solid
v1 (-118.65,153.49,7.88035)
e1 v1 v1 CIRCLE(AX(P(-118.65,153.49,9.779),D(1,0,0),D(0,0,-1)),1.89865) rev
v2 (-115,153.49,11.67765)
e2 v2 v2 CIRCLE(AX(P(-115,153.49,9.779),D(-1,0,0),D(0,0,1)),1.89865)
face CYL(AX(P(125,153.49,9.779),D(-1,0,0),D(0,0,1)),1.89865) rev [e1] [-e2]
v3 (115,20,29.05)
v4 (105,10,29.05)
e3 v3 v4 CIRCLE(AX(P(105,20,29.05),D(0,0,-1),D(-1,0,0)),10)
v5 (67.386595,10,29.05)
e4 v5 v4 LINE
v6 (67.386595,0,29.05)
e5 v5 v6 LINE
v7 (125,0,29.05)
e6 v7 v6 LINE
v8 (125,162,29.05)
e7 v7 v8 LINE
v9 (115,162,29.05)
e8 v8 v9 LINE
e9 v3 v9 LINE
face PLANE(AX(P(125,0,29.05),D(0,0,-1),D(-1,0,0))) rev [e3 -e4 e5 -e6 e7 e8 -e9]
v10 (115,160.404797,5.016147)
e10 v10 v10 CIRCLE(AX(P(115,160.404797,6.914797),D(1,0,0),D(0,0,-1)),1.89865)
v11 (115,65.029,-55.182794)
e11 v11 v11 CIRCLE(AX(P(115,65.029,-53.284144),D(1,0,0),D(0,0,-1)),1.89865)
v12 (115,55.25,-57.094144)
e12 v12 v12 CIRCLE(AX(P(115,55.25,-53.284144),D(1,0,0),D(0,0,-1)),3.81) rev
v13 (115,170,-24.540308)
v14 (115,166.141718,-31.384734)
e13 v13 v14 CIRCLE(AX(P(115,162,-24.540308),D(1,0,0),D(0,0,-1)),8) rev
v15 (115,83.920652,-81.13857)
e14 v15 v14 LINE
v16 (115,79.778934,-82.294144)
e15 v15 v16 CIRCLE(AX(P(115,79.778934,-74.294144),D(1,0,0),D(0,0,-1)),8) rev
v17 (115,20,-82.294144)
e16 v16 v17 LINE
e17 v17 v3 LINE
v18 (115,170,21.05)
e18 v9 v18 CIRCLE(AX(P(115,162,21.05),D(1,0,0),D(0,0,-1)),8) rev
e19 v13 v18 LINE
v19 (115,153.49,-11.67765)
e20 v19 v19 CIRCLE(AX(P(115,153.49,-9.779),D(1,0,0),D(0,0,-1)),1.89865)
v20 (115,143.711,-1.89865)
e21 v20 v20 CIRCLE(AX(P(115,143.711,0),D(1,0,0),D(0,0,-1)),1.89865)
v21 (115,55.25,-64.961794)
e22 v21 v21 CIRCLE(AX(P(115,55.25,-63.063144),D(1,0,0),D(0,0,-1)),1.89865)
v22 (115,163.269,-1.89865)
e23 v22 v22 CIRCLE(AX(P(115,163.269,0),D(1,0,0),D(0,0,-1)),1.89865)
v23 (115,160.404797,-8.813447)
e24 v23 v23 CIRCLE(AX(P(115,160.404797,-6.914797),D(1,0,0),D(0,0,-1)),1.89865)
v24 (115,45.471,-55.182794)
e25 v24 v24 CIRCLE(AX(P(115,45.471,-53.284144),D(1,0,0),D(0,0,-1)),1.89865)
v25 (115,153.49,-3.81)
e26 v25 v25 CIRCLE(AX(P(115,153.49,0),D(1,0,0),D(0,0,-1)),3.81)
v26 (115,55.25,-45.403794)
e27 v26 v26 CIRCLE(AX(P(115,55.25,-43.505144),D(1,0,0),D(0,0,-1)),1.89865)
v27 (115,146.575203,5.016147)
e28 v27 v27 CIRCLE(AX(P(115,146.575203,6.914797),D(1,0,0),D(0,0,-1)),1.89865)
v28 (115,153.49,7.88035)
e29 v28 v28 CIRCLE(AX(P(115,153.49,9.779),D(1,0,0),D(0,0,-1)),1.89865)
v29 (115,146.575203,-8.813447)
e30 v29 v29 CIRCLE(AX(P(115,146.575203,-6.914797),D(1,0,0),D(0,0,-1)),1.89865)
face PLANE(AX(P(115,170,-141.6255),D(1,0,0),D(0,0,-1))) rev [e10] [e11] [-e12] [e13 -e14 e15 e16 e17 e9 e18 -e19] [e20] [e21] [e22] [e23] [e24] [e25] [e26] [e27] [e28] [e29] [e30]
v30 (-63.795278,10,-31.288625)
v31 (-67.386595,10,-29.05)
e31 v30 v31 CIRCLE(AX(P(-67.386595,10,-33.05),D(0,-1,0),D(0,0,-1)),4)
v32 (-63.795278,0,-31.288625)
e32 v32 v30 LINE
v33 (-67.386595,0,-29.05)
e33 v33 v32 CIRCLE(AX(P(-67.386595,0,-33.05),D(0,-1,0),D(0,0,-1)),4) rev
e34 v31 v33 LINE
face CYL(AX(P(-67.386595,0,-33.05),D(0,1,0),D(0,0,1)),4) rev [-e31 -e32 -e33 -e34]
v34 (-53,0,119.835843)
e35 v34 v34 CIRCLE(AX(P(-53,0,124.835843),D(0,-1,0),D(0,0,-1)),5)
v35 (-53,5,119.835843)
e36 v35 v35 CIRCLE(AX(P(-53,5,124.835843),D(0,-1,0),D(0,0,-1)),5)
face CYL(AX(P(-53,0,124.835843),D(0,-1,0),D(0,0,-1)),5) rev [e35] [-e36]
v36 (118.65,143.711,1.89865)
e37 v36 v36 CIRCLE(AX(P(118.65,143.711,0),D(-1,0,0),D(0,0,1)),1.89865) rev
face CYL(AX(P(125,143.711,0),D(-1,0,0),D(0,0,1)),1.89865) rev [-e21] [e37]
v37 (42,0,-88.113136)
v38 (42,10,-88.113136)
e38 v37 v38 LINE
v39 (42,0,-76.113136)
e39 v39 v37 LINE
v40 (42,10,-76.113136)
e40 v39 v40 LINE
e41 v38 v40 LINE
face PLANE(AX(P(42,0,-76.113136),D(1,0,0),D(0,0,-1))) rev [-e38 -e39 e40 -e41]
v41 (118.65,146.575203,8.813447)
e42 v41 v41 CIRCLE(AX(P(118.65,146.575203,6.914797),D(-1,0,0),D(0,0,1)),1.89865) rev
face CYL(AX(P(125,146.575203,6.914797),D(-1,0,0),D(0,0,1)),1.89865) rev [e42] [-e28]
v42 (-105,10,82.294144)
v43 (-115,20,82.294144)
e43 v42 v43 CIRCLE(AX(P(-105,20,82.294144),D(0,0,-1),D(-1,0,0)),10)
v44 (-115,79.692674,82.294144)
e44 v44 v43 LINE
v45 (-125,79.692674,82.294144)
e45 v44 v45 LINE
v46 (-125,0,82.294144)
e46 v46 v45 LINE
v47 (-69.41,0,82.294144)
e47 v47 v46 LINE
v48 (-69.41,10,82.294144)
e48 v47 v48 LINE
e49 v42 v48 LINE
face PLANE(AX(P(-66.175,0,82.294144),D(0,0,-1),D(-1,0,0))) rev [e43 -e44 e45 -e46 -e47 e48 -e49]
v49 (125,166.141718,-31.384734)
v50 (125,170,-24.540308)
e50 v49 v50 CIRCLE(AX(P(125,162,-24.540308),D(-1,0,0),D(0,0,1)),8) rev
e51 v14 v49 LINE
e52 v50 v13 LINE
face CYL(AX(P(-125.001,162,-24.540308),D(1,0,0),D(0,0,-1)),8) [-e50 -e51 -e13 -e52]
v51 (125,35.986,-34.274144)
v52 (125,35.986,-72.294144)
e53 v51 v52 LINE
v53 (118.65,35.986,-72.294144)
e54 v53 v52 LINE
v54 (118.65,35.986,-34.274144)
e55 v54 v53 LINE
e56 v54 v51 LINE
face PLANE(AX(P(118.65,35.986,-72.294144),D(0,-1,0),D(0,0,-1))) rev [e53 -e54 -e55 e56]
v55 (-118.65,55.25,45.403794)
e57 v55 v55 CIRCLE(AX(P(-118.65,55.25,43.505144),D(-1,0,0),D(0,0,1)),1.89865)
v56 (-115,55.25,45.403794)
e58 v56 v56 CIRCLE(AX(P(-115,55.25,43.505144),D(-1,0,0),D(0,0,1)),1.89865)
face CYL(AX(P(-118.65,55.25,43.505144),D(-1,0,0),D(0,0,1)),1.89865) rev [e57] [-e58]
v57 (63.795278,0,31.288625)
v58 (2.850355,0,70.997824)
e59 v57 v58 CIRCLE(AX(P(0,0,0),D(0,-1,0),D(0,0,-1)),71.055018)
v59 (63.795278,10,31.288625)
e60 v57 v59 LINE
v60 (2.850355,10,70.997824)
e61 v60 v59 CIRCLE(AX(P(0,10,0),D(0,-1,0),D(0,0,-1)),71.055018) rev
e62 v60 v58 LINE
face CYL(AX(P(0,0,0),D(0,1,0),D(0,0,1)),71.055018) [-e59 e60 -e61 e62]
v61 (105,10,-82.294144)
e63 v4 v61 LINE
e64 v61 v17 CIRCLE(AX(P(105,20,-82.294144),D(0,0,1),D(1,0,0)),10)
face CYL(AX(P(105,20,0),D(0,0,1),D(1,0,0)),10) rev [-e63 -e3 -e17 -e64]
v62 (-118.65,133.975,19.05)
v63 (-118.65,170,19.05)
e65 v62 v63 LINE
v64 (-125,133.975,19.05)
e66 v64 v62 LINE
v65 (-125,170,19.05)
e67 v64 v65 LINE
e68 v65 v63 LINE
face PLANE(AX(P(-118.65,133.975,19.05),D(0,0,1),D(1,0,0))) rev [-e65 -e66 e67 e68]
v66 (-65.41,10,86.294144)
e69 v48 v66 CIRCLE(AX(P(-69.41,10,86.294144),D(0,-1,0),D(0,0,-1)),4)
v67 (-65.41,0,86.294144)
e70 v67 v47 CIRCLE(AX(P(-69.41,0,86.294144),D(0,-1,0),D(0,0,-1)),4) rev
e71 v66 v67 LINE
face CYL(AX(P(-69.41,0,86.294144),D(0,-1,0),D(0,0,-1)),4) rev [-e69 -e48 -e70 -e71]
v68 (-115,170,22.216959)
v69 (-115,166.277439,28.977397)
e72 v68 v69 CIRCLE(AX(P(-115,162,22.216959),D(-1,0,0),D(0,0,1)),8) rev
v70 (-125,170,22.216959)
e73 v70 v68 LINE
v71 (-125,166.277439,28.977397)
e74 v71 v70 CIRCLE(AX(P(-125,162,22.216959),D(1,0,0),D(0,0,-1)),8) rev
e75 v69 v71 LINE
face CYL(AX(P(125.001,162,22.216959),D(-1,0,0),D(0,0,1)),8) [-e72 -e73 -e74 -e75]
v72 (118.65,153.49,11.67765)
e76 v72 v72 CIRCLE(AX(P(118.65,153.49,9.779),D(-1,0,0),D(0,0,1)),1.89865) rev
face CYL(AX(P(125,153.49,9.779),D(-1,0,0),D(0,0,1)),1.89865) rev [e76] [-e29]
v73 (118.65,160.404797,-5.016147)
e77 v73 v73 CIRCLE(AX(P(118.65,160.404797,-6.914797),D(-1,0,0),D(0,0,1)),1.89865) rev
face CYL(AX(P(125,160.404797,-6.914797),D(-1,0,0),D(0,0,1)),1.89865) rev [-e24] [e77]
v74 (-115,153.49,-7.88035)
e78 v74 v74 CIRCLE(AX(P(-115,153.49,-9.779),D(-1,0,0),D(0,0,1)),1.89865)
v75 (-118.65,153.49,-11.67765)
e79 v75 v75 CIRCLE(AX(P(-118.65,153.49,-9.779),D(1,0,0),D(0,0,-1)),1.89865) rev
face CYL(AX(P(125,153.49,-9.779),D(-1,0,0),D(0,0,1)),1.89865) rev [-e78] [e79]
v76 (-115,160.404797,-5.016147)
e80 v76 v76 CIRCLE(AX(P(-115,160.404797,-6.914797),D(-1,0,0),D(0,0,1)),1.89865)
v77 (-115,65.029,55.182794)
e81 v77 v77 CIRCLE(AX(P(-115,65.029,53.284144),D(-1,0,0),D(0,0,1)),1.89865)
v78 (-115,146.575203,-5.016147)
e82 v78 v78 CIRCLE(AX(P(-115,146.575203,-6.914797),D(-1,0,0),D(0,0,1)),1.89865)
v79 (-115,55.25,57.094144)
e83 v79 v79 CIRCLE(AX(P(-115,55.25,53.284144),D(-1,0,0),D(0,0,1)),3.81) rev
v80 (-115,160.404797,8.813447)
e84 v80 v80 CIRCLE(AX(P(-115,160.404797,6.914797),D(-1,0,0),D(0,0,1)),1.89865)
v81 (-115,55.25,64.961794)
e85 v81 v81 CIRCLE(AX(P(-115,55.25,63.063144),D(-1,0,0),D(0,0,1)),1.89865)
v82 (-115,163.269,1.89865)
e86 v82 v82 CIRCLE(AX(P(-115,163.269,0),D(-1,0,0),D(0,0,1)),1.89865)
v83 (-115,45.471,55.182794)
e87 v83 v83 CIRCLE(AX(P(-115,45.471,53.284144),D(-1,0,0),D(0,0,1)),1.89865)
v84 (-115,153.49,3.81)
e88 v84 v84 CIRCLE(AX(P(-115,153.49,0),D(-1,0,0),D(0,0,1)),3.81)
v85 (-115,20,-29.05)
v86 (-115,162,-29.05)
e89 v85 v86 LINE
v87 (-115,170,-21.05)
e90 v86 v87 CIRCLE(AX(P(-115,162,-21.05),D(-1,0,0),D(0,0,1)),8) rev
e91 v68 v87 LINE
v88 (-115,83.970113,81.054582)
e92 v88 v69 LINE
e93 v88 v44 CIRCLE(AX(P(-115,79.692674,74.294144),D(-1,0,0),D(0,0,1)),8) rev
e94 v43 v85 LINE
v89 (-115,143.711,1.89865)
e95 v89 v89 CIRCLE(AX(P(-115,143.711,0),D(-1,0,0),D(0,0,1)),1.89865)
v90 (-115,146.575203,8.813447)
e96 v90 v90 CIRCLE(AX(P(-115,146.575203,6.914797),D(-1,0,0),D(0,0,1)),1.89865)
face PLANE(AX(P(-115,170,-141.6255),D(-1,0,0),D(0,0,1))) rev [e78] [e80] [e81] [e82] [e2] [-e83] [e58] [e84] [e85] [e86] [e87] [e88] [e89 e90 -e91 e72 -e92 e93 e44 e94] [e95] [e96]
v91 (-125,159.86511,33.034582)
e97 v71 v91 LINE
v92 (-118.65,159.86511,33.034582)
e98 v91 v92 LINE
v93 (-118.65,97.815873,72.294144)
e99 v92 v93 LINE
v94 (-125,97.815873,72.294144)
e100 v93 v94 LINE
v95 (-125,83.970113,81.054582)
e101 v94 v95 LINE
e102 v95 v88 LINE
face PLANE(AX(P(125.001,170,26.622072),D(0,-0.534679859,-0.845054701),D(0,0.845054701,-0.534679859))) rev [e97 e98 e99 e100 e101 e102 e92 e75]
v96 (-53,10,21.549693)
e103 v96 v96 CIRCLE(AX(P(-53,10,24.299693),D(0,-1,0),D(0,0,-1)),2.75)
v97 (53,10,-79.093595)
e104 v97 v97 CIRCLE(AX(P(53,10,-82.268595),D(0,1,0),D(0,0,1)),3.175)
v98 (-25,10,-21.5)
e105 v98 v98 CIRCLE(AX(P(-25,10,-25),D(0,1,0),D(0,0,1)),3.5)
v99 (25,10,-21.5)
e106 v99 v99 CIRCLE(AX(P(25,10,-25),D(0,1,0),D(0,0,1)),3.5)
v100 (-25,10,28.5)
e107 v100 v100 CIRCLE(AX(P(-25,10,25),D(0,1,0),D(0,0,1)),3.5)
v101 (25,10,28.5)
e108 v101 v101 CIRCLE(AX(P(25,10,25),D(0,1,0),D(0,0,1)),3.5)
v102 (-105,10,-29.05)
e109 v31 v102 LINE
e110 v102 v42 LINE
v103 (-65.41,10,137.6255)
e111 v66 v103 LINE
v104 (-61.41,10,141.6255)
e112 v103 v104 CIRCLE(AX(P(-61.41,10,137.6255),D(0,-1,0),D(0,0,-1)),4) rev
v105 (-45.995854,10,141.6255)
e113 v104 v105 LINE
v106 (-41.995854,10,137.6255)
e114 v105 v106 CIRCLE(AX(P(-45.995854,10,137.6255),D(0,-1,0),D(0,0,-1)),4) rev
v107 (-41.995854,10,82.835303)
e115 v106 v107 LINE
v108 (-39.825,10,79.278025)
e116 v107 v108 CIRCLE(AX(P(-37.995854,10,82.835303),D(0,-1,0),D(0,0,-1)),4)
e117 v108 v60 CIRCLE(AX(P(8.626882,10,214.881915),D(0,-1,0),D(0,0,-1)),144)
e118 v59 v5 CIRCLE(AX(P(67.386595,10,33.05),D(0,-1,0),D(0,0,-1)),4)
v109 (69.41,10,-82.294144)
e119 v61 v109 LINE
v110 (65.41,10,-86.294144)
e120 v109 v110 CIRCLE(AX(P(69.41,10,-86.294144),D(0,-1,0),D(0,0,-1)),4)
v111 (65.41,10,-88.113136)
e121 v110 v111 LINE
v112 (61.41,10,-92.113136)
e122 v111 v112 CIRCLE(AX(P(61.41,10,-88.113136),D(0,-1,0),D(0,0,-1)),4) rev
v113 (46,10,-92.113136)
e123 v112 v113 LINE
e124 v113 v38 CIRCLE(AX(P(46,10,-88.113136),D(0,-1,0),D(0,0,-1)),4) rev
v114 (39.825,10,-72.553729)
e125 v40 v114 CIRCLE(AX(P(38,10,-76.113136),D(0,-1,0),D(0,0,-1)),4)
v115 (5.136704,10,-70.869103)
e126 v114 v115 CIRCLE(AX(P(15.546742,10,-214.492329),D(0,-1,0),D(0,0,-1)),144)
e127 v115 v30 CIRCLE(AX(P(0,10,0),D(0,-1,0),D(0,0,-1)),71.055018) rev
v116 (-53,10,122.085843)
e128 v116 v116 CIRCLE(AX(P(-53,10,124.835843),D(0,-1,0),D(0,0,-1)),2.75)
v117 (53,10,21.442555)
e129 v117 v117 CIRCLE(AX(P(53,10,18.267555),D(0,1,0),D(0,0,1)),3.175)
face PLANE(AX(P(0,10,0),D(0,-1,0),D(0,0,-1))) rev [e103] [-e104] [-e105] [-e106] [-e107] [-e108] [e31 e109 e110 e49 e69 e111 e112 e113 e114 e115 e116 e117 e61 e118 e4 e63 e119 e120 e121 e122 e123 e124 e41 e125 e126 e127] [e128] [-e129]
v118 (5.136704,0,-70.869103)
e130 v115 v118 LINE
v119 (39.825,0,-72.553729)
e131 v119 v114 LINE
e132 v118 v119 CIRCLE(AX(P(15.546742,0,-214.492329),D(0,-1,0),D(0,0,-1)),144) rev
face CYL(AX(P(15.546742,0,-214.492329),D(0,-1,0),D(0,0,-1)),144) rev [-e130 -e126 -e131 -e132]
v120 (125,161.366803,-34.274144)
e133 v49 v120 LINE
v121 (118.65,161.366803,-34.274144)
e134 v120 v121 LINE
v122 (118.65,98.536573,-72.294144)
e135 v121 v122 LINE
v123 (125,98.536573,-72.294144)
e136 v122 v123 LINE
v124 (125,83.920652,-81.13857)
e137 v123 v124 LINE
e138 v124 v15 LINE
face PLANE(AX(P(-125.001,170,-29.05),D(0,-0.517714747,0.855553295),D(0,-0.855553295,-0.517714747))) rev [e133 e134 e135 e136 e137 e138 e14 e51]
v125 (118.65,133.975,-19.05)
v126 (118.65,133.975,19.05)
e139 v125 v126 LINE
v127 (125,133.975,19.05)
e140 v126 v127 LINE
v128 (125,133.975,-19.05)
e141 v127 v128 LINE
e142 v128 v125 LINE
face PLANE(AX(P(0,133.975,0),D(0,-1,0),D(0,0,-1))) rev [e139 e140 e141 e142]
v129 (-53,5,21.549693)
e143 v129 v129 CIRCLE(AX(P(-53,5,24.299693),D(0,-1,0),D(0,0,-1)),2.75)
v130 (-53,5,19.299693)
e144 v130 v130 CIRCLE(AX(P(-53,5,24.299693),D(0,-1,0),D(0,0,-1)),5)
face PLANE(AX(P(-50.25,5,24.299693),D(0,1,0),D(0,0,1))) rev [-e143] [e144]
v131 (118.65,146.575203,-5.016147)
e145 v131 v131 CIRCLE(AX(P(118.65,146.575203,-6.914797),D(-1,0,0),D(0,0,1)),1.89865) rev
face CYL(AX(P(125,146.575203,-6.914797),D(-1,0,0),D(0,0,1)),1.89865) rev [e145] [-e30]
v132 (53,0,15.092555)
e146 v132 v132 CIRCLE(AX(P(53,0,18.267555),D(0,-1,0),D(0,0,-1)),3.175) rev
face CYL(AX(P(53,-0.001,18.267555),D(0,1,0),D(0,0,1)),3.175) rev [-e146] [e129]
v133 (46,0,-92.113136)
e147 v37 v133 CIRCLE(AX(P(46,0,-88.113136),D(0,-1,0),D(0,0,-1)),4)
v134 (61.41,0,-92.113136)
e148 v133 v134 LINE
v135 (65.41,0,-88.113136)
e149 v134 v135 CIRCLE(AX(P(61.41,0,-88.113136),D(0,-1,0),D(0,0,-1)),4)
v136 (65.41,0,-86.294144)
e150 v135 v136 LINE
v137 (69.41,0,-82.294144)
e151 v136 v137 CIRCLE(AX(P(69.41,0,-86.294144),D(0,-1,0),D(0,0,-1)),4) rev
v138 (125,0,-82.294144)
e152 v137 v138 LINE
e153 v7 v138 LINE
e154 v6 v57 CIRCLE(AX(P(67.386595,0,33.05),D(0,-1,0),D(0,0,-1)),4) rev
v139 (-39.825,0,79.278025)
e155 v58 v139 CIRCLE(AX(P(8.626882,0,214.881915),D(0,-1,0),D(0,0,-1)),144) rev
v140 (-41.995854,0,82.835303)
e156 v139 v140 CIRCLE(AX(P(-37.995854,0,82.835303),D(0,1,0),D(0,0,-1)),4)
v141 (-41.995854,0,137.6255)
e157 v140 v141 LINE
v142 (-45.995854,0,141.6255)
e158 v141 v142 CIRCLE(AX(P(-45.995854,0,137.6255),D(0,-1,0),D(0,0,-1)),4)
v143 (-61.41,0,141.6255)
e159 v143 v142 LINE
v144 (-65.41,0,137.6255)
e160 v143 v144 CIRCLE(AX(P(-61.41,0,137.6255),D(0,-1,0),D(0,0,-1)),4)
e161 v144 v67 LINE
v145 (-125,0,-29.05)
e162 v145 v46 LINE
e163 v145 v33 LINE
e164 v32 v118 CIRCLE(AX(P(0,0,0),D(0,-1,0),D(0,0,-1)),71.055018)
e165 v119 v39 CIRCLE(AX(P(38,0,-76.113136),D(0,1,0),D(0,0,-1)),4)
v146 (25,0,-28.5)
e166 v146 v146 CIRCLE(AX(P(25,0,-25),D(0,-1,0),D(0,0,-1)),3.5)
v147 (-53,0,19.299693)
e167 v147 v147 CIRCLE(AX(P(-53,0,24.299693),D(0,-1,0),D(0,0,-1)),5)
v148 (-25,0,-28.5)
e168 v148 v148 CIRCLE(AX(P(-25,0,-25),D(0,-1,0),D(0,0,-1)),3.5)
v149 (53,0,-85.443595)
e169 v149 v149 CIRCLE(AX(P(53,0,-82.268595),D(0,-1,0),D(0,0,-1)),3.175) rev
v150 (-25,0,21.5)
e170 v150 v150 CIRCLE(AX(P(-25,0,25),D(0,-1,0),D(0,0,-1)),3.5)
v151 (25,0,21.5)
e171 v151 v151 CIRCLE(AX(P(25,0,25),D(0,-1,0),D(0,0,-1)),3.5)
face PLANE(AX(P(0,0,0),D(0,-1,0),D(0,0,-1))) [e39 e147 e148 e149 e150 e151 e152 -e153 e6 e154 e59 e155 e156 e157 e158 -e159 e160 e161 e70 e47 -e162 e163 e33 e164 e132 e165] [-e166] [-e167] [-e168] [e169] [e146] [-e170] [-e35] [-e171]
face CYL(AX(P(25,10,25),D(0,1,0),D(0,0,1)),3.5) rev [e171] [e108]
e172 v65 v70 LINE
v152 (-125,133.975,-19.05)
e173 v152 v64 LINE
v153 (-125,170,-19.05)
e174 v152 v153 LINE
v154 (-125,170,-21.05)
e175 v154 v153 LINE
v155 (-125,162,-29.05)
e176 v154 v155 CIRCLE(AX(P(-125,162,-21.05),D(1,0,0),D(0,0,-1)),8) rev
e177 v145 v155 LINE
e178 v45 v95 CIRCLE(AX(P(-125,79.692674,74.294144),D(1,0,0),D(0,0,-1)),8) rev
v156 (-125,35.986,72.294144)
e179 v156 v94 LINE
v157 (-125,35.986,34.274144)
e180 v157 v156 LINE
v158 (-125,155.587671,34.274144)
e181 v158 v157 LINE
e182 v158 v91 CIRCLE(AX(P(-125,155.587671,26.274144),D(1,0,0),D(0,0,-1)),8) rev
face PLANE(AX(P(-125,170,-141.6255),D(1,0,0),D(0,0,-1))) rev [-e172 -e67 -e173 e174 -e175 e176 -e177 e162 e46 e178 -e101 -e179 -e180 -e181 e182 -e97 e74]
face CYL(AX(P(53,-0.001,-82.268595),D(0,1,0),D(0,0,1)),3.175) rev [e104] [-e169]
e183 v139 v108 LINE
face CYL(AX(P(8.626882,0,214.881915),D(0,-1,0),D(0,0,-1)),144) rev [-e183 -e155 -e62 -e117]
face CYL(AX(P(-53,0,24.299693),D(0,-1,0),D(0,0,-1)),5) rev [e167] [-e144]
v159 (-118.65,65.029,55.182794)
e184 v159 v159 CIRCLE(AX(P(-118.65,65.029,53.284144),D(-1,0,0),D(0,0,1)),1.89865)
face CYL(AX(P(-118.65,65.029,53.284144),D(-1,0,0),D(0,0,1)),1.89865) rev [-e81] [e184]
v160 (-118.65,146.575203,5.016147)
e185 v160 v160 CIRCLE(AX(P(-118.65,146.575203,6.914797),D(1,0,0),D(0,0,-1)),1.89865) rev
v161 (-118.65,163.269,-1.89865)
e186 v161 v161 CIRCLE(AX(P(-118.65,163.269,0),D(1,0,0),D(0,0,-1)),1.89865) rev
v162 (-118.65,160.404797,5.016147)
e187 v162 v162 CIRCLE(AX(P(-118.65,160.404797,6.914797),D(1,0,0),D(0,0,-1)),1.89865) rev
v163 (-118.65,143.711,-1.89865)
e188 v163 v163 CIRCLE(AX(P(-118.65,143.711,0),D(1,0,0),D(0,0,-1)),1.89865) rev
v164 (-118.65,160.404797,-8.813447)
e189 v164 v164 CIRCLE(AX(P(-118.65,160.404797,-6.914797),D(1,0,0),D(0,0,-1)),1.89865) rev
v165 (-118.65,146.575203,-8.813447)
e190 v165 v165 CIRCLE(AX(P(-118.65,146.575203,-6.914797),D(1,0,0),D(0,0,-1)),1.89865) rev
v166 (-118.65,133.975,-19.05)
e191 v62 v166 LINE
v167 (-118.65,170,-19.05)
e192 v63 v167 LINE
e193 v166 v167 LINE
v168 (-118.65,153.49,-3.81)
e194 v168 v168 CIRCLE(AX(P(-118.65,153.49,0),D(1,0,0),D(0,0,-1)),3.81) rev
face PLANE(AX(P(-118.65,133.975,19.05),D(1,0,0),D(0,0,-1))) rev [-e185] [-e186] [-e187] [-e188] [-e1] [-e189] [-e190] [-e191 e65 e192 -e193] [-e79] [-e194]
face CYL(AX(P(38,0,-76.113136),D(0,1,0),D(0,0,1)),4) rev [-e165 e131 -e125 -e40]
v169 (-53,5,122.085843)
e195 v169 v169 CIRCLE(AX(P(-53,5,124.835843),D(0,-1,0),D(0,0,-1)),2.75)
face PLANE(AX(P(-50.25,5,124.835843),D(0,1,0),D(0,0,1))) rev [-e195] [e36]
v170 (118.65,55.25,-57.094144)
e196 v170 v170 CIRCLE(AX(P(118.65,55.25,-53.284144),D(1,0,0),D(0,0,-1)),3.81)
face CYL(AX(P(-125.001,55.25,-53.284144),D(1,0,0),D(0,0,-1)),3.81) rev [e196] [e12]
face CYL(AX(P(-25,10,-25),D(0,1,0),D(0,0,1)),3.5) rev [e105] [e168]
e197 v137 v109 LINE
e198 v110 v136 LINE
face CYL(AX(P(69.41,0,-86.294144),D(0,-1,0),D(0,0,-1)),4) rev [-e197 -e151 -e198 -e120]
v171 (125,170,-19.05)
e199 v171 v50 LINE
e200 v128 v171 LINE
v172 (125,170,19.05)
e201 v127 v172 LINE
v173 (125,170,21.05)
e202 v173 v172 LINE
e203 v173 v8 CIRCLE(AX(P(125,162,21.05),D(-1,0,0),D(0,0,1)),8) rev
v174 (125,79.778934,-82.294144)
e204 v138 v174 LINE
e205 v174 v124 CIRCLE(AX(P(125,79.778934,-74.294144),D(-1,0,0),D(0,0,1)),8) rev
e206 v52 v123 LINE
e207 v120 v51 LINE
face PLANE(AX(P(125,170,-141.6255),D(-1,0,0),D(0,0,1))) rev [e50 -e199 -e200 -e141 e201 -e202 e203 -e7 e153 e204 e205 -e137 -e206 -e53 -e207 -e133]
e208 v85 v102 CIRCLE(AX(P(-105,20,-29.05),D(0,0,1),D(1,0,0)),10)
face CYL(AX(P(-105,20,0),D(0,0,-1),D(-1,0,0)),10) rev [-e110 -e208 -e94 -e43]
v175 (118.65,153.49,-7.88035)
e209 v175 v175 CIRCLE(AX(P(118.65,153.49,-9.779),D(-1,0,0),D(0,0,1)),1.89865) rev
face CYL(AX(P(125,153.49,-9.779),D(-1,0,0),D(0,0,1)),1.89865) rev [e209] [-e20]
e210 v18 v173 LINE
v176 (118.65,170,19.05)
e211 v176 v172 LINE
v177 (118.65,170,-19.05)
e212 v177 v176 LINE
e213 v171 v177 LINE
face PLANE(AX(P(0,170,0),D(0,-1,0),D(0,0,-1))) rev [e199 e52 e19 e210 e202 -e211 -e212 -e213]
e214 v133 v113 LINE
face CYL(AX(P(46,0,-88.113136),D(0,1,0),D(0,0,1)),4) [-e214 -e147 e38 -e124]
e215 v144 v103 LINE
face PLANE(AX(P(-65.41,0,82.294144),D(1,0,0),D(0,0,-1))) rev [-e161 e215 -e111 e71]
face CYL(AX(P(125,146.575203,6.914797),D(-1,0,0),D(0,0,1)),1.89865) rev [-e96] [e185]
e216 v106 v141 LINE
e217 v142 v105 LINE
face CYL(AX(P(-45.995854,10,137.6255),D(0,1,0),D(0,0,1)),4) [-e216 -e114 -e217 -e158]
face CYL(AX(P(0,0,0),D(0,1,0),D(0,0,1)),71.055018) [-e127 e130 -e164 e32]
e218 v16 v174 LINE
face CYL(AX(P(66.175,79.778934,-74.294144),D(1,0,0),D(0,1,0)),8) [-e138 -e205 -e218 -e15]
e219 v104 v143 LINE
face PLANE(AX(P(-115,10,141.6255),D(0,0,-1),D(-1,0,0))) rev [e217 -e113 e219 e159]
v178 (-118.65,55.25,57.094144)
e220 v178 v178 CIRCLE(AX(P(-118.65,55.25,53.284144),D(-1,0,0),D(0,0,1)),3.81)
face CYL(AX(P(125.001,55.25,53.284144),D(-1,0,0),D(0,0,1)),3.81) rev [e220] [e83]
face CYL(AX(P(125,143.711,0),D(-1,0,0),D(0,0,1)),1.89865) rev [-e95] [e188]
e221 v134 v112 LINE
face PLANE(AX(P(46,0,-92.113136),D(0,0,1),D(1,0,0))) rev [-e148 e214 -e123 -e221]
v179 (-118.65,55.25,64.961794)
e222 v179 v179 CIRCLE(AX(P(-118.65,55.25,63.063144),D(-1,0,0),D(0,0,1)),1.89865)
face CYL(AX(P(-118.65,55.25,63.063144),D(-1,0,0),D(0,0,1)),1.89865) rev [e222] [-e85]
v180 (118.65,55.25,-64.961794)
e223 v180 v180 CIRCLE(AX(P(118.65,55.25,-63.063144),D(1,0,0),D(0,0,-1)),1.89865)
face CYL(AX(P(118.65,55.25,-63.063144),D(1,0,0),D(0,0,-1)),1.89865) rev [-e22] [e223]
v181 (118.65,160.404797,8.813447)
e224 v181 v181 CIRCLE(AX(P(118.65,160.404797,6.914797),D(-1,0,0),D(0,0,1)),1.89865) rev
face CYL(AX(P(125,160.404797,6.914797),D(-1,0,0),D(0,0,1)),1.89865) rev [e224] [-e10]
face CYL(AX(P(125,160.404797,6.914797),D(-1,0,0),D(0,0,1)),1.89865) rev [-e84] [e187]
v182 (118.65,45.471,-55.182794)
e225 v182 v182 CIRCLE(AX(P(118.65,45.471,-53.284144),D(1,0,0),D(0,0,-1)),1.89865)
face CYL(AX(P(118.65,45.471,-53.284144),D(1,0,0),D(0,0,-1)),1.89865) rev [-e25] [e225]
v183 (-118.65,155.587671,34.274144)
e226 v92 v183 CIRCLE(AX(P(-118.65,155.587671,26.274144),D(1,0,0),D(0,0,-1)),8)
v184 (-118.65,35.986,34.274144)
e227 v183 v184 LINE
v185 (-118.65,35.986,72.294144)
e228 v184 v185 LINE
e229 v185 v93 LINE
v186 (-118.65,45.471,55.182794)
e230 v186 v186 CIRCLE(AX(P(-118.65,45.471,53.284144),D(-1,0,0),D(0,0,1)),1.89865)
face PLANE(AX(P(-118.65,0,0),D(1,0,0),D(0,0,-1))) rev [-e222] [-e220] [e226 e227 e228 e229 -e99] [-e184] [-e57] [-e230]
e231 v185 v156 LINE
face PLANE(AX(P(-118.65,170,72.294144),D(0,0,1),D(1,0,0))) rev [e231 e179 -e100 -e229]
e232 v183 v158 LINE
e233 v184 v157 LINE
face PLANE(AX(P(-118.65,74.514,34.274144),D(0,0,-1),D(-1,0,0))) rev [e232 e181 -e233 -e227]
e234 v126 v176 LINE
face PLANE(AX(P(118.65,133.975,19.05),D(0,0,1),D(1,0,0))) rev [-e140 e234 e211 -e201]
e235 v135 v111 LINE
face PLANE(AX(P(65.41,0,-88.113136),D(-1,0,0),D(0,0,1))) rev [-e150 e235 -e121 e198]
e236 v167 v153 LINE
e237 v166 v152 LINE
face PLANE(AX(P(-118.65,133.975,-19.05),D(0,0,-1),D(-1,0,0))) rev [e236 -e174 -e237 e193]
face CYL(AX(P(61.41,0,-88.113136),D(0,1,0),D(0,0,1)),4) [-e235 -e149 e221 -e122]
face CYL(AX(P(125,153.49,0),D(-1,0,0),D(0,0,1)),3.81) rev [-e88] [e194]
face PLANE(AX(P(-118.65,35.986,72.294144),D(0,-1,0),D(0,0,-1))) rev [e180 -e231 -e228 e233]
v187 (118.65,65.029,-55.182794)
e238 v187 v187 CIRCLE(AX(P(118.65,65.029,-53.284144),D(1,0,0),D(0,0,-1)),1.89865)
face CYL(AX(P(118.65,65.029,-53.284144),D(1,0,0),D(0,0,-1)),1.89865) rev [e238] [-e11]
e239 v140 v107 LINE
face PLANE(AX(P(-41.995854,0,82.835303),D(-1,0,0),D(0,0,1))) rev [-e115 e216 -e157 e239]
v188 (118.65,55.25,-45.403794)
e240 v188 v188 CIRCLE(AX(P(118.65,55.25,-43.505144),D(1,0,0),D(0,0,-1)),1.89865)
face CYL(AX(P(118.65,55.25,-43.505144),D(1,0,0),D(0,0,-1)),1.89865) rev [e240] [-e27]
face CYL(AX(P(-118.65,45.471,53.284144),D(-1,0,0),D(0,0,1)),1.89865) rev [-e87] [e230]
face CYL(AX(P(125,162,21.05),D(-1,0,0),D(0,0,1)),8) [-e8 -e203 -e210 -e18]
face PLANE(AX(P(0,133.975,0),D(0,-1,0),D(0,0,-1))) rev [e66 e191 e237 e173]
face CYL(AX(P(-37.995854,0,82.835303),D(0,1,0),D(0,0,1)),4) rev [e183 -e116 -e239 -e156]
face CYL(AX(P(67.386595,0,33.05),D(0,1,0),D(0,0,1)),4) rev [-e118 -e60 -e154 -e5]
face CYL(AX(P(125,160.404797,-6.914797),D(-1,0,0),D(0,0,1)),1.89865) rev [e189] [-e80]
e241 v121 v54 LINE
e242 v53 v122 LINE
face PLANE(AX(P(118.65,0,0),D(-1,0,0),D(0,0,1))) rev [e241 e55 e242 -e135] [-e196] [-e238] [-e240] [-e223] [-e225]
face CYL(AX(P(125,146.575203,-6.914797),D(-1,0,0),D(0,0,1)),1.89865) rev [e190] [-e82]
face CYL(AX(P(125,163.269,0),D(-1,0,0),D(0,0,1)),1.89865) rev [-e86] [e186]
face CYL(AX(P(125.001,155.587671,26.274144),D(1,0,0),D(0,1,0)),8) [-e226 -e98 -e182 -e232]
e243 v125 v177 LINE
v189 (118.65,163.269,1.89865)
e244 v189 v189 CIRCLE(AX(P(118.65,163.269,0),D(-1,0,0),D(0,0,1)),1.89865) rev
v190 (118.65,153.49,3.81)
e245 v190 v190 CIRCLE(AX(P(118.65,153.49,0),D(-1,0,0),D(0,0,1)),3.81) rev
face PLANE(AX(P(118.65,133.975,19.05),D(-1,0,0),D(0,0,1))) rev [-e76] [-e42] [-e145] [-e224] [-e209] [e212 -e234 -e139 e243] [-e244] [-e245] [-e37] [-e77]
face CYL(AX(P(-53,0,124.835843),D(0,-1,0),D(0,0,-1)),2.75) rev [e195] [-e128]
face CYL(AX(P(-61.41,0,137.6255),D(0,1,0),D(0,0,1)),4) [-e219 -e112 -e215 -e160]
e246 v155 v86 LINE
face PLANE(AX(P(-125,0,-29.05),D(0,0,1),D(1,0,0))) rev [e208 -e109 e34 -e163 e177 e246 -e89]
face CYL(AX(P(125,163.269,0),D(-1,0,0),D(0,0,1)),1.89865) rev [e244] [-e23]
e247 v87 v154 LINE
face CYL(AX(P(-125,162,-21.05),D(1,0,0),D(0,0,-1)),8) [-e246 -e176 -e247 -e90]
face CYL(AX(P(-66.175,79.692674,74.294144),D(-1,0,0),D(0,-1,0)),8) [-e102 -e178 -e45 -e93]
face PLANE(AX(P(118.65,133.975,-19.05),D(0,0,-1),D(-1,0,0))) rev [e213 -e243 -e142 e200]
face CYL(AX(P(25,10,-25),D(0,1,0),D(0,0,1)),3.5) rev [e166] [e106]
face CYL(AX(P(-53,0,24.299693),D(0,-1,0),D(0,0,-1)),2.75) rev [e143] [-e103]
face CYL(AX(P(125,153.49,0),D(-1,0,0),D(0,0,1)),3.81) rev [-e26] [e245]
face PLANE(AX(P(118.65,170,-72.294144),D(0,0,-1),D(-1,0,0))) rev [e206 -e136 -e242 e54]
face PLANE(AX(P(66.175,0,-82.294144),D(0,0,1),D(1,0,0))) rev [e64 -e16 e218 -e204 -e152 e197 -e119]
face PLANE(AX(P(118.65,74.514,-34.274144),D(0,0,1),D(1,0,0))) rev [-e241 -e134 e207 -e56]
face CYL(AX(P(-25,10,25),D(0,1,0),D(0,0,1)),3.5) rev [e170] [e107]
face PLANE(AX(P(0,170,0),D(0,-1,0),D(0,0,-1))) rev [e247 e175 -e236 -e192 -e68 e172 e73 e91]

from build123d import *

# Parameters (mm, degrees)
SKETCH2_W                      = 230
SKETCH2_H                      = 283.251
BOSS_EXTRUDE1_DEPTH            = 10
SKETCH3_W                      = 10
SKETCH3_H                      = 283.251
BOSS_EXTRUDE2_DEPTH            = 170
M6_CLEARANCE_HOLE1_D           = 7
CUT_EXTRUDE1_DEPTH             = 327.431895271
CUT_EXTRUDE1_DEPTH_BACK        = 327.431895271
SKETCH7_R                      = 3.81
SKETCH7_R_2                    = 1.89865
SKETCH8_W                      = 6.35
SKETCH8_H                      = 38.1
CUT_EXTRUDE2_DEPTH             = 36.025
CUT_EXTRUDE3_DEPTH             = 6.35
CUT_EXTRUDE4_REACH             = 331.125
SKETCH11_R                     = 3.81
F_6_CLEARANCE_HOLE1_D          = 3.7973
F_6_CLEARANCE_HOLE1_DEPTH      = 3.65
CIRPATTERN1_COUNT              = 2
ENL_V_MAT_EXTRU_1_REACH        = 249.554
ESQUISSE1_R                    = 3.175
CBORE_FOR_M5_SHCS1_D           = 5.5
CBORE_FOR_M5_SHCS1_CBORE_D     = 10
CBORE_FOR_M5_SHCS1_CBORE_DEPTH = 5
CUT_EXTRUDE5_DEPTH             = 248.553594703
CUT_EXTRUDE5_DEPTH_BACK        = 248.553594703
SKETCH15_W                     = 58.825
SKETCH15_H                     = 59.331356017
CUT_EXTRUDE7_DEPTH             = 248.553594703
CUT_EXTRUDE7_DEPTH_BACK        = 248.553594703
SKETCH20_W                     = 0.765
SKETCH20_H                     = 59.331356017
FILLET2_R                      = 4
FILLET3_R                      = 144
FILLET4_R                      = 4
CUT_EXTRUDE8_REACH             = 335.853
CUT_EXTRUDE9_REACH             = 335.853
FILLET5_R                      = 8
FILLET6_R                      = 8
FILLET7_R                      = 10


with BuildPart() as part:
    # Sketch2 → Boss-Extrude1 (new body)
    with BuildSketch(Plane(origin=(0, 0, 0), x_dir=(1, 0, 0), z_dir=(0, 1, 0))):
        Rectangle(SKETCH2_W, SKETCH2_H)
    extrude(amount=BOSS_EXTRUDE1_DEPTH)

    # Sketch3 → Boss-Extrude2 (add)
    with BuildSketch(Plane(origin=(0, 0, 0), x_dir=(1, 0, 0), z_dir=(0, 1, 0))):
        with Locations((-120, 0)):
            Rectangle(SKETCH3_W, SKETCH3_H)
        with Locations((120, 0)):
            Rectangle(SKETCH3_W, SKETCH3_H)
    extrude(amount=BOSS_EXTRUDE2_DEPTH)

    # M6 Clearance Hole1 (through all)
    with Locations(Plane(origin=(0, 10, 0), x_dir=(1, 0, 0), z_dir=(0, 1, 0))):
        with Locations((-25, 25), (25, 25), (25, -25), (-25, -25)):
            Hole(M6_CLEARANCE_HOLE1_D / 2)

    # Sketch7 → Cut-Extrude1 (cut, two sides: drawn at the far end of the back side and taken through both)
    with BuildSketch(Plane.ZY.offset(-115).offset(-CUT_EXTRUDE1_DEPTH_BACK)):
        with Locations((0, 153.49)):
            Circle(SKETCH7_R)
        with Locations((0, 163.269)):
            Circle(SKETCH7_R_2)
        with Locations((6.914797213, 160.404797213)):
            Circle(SKETCH7_R_2)
        with Locations((9.779, 153.49)):
            Circle(SKETCH7_R_2)
        with Locations((6.914797213, 146.575202787)):
            Circle(SKETCH7_R_2)
        with Locations((0, 143.711)):
            Circle(SKETCH7_R_2)
        with Locations((-6.914797213, 146.575202787)):
            Circle(SKETCH7_R_2)
        with Locations((-9.779, 153.49)):
            Circle(SKETCH7_R_2)
        with Locations((-6.914797213, 160.404797213)):
            Circle(SKETCH7_R_2)
    extrude(amount=CUT_EXTRUDE1_DEPTH + CUT_EXTRUDE1_DEPTH_BACK, mode=Mode.SUBTRACT)

    # Sketch8 → Cut-Extrude2 (cut)
    with BuildSketch(Plane(origin=(0, 170, 0), x_dir=(1, 0, 0), z_dir=(0, 1, 0))):
        with Locations((121.825, 0)):
            Rectangle(SKETCH8_W, SKETCH8_H)
        with Locations((-121.825, 0)):
            Rectangle(SKETCH8_W, SKETCH8_H)
    extrude(amount=-CUT_EXTRUDE2_DEPTH, mode=Mode.SUBTRACT)

    # Sketch9 → Cut-Extrude3 (cut)
    with BuildSketch(Plane(origin=(125, 0, 0), x_dir=(0, 0, -1), z_dir=(1, 0, 0))):
        Polygon((72.294143983, 74.514), (72.294143983, 35.986), (34.274143983, 35.986), (34.274143983, 74.514), (34.274143983, 170), (72.294143983, 170), align=None)
    cut_extrude3 = extrude(amount=-CUT_EXTRUDE3_DEPTH, mode=Mode.SUBTRACT)

    # Sketch11 → Cut-Extrude4 (cut, up to next)
    with BuildSketch(Plane(origin=(118.65, 0, 0), x_dir=(0, 0, -1), z_dir=(1, 0, 0)), mode=Mode.PRIVATE) as cut_extrude4_sk1:
        with Locations((53.284143983, 55.25)):
            Circle(SKETCH11_R)
    cut_extrude4_tool1 = extrude(cut_extrude4_sk1.sketch, amount=-CUT_EXTRUDE4_REACH, mode=Mode.PRIVATE) & part.part
    cut_extrude4 = cut_extrude4_tool1.solids().sort_by_distance((118.65, 55.25, -53.284144))[0]
    add(cut_extrude4, mode=Mode.SUBTRACT)

    # #6 Clearance Hole1
    with Locations(Plane(origin=(118.65, 0, 0), x_dir=(0, 0, -1), z_dir=(1, 0, 0))):
        with Locations((53.284143983, 65.029), (43.505143983, 55.25), (63.063143983, 55.25), (53.284143983, 45.471)):
            f_6_clearance_hole1 = Hole(F_6_CLEARANCE_HOLE1_D / 2, depth=F_6_CLEARANCE_HOLE1_DEPTH)

    # CirPattern1: Cut-Extrude3, Cut-Extrude4, #6 Clearance Hole1 ×2 about axis
    cirpattern1_axis = Axis((0, 0, 0), (0, 1, 0))
    add([cut_extrude3.rotate(cirpattern1_axis, i * 360 / CIRPATTERN1_COUNT) for i in range(1, CIRPATTERN1_COUNT)], mode=Mode.SUBTRACT)
    add([cut_extrude4.rotate(cirpattern1_axis, i * 360 / CIRPATTERN1_COUNT) for i in range(1, CIRPATTERN1_COUNT)], mode=Mode.SUBTRACT)
    add([f_6_clearance_hole1.rotate(cirpattern1_axis, i * 360 / CIRPATTERN1_COUNT) for i in range(1, CIRPATTERN1_COUNT)], mode=Mode.SUBTRACT)

    # Esquisse1 → Enlèv. mat.-Extru.1 (cut, up to next)
    with BuildSketch(Plane(origin=(0, 10, 0), x_dir=(1, 0, 0), z_dir=(0, 1, 0)), mode=Mode.PRIVATE) as enl_v_mat_extru_1_sk1:
        with Locations(Location((53, 82.268595163, 0), (0, 0, 270))):
            Circle(ESQUISSE1_R)
    enl_v_mat_extru_1_tool1 = extrude(enl_v_mat_extru_1_sk1.sketch, amount=-ENL_V_MAT_EXTRU_1_REACH, mode=Mode.PRIVATE) & part.part
    # Esquisse1 → Enlèv. mat.-Extru.1 (cut, up to next)
    with BuildSketch(Plane(origin=(0, 10, 0), x_dir=(1, 0, 0), z_dir=(0, 1, 0)), mode=Mode.PRIVATE) as enl_v_mat_extru_1_sk2:
        with Locations(Location((53, -18.267555417, 0), (0, 0, 270))):
            Circle(ESQUISSE1_R)
    enl_v_mat_extru_1_tool2 = extrude(enl_v_mat_extru_1_sk2.sketch, amount=-ENL_V_MAT_EXTRU_1_REACH, mode=Mode.PRIVATE) & part.part
    add(enl_v_mat_extru_1_tool1.solids().sort_by_distance((53, 10, -82.268595))[0], mode=Mode.SUBTRACT)
    add(enl_v_mat_extru_1_tool2.solids().sort_by_distance((53, 10, 18.267555))[0], mode=Mode.SUBTRACT)

    # CBORE for M5 SHCS1 (through all)
    with Locations(Plane(origin=(0, 0, 0), x_dir=(-1, 0, 0), z_dir=(0, -1, 0))):
        with Locations((53, -24.299692803), (53, -124.835843383)):
            CounterBoreHole(CBORE_FOR_M5_SHCS1_D / 2, CBORE_FOR_M5_SHCS1_CBORE_D / 2, CBORE_FOR_M5_SHCS1_CBORE_DEPTH)

    # Sketch15 → Cut-Extrude5 (cut, two sides: drawn at the far end of the back side and taken through both)
    with BuildSketch(Plane(origin=(0, 10, 0), x_dir=(1, 0, 0), z_dir=(0, 1, 0)).offset(-CUT_EXTRUDE5_DEPTH_BACK)):
        with BuildLine():
            Line((125, 141.6255), (-125, 141.6255))
            Line((-125, 141.6255), (-125, 29.05))
            Line((-125, 29.05), (-64.845300659, 29.05))
            ThreePointArc((-64.845300659, 29.05), (-19.453683623, 68.340103242), (39.825, 58.845432215))
            Line((39.825, 58.845432215), (39.825, 95.443595163))
            Line((39.825, 95.443595163), (66.175, 95.443595163))
            Line((66.175, 95.443595163), (66.175, 82.294143983))
            Line((66.175, 82.294143983), (125, 82.294143983))
            Line((125, 82.294143983), (125, 141.6255))
        make_face()
        with BuildLine():
            Line((125, -141.6255), (125, -29.05))
            Line((125, -29.05), (64.845300659, -29.05))
            ThreePointArc((64.845300659, -29.05), (19.453683623, -68.340103242), (-39.825, -58.845432215))
            Line((-39.825, -58.845432215), (-39.825, -141.6255))
            Line((-39.825, -141.6255), (125, -141.6255))
        make_face()
        with Locations((-95.5875, -111.959821992)):
            Rectangle(SKETCH15_W, SKETCH15_H)
    extrude(amount=CUT_EXTRUDE5_DEPTH + CUT_EXTRUDE5_DEPTH_BACK, mode=Mode.SUBTRACT)

    # Sketch20 → Cut-Extrude7 (cut, two sides: drawn at the far end of the back side and taken through both)
    with BuildSketch(Plane(origin=(0, 10, 0), x_dir=(1, 0, 0), z_dir=(0, 1, 0)).offset(-CUT_EXTRUDE7_DEPTH_BACK)):
        with Locations((-65.7925, -111.959821992)):
            Rectangle(SKETCH20_W, SKETCH20_H)
        with BuildLine():
            Line((-39.824999998, -141.6255), (-39.824999998, -79.27802459))
            ThreePointArc((-39.824999998, -79.27802459), (-41.410278354, -80.751625782), (-41.995854347, -82.835302509))
            Line((-41.995854347, -82.835302509), (-41.995854347, -141.6255))
            Line((-41.995854347, -141.6255), (-39.824999998, -141.6255))
        make_face()
        with BuildLine():
            Line((39.825, 95.443595163), (66.175, 95.443595163))
            Line((66.175, 95.443595163), (66.175, 82.294143983))
            Line((66.175, 82.294143983), (65.41, 82.294143983))
            Line((65.41, 82.294143983), (65.41, 88.113136011))
            ThreePointArc((65.41, 88.113136011), (64.238427125, 90.941563136), (61.41, 92.113136011))
            Line((61.41, 92.113136011), (46, 92.113136011))
            ThreePointArc((46, 92.113136011), (43.171572875, 90.941563136), (42, 88.113136011))
            Line((42, 88.113136011), (42, 76.113136011))
            ThreePointArc((42, 76.113136011), (41.413209633, 74.02747065), (39.825, 72.553729459))
            Line((39.825, 72.553729459), (39.825, 95.443595163))
        make_face()
    extrude(amount=CUT_EXTRUDE7_DEPTH + CUT_EXTRUDE7_DEPTH_BACK, mode=Mode.SUBTRACT)

    # Fillet2
    fillet2_edges = [part.edges().sort_by_distance(p)[0] for p in [
        (-65.41, 5, 141.6255),
        (-41.995854347, 5, 141.6255),
    ]]
    fillet(fillet2_edges, radius=FILLET2_R)

    # Fillet3
    # the kernel refuses this fillet: 144 mm, written as the material it adds along each edge
    with BuildSketch(Plane(origin=(39.825, 0, -58.845432215), x_dir=(-0.9448497264443181, 0, -0.3275041899550252), z_dir=(0, 1, 0))) as fillet3_piece_1:
        with BuildLine():
            CenterArc((73.914316816, -139.111696925), FILLET3_R, 104.971721204, 13.852011514)
            Line((4.489524785, -12.952280901), (0, 0))
            ThreePointArc((0, 0), (18.356514745, -2.412072644), (36.713029491, 0))
        make_face()
    extrude(amount=10)
    with BuildSketch(Plane(origin=(-39.825, 10, 58.845432215), x_dir=(1.16727742405119e-10, 0, 1.0), z_dir=(0, -1, 0))) as fillet3_piece_2:
        with BuildLine():
            CenterArc((156.036482988, -48.451881806), FILLET3_R, 160.337962033, 17.363014277)
            ThreePointArc((12.15239164, -42.675355439), (9.492802158, -20.364752295), (0, 0))
            Line((0, 0), (20.432592375, 0))
        make_face()
    extrude(amount=10)

    # Fillet4
    fillet4_edges = [part.edges().sort_by_distance(p)[0] for p in [
        (-64.845300659, 5, -29.05),
        (64.845300659, 5, 29.05),
        (-65.41, 5, 82.294143983),
        (65.41, 5, -82.294143983),
    ]]
    fillet(fillet4_edges, radius=FILLET4_R)

    # Sketch22 → Cut-Extrude8 (cut, up to next)
    with BuildSketch(Plane.ZY.offset(125), mode=Mode.PRIVATE) as cut_extrude8_sk1:
        Polygon((26.622071991, 170), (82.294143983, 82.011), (82.294143983, 170), align=None)
    cut_extrude8_tool1 = extrude(cut_extrude8_sk1.sketch, amount=-CUT_EXTRUDE8_REACH, mode=Mode.PRIVATE) & part.part
    add(cut_extrude8_tool1.solids().sort_by_distance((-125, 140.670333, 63.736787))[0], mode=Mode.SUBTRACT)

    # Sketch23 → Cut-Extrude9 (cut, up to next)
    with BuildSketch(Plane(origin=(125, 0, 0), x_dir=(0, 0, -1), z_dir=(1, 0, 0)), mode=Mode.PRIVATE) as cut_extrude9_sk1:
        Polygon((29.05, 170), (82.294143983, 82.011), (82.294143983, 170), align=None)
    cut_extrude9_tool1 = extrude(cut_extrude9_sk1.sketch, amount=-CUT_EXTRUDE9_REACH, mode=Mode.PRIVATE) & part.part
    add(cut_extrude9_tool1.solids().sort_by_distance((125, 140.670333, -64.546096))[0], mode=Mode.SUBTRACT)

    # Fillet5
    fillet5_edges = [part.edges().sort_by_distance(p)[0] for p in [
        (-120, 170, -29.05),
        (120, 170, 29.05),
        (-120, 82.011, 82.294143983),
        (-120, 170, 26.622071991),
        (120, 170, -29.05),
        (120, 82.011, -82.294143983),
    ]]
    fillet(fillet5_edges, radius=FILLET5_R)

    # Fillet6
    fillet6_edges = [part.edges().sort_by_distance(p)[0] for p in [
        (-121.825, 157.905997776, 34.274143983),
    ]]
    fillet(fillet6_edges, radius=FILLET6_R)

    # Fillet7
    fillet7_edges = [part.edges().sort_by_distance(p)[0] for p in [
        (115, 10, -26.622071991),
        (-115, 10, 26.622071991),
    ]]
    fillet(fillet7_edges, radius=FILLET7_R)


solid = part.part
